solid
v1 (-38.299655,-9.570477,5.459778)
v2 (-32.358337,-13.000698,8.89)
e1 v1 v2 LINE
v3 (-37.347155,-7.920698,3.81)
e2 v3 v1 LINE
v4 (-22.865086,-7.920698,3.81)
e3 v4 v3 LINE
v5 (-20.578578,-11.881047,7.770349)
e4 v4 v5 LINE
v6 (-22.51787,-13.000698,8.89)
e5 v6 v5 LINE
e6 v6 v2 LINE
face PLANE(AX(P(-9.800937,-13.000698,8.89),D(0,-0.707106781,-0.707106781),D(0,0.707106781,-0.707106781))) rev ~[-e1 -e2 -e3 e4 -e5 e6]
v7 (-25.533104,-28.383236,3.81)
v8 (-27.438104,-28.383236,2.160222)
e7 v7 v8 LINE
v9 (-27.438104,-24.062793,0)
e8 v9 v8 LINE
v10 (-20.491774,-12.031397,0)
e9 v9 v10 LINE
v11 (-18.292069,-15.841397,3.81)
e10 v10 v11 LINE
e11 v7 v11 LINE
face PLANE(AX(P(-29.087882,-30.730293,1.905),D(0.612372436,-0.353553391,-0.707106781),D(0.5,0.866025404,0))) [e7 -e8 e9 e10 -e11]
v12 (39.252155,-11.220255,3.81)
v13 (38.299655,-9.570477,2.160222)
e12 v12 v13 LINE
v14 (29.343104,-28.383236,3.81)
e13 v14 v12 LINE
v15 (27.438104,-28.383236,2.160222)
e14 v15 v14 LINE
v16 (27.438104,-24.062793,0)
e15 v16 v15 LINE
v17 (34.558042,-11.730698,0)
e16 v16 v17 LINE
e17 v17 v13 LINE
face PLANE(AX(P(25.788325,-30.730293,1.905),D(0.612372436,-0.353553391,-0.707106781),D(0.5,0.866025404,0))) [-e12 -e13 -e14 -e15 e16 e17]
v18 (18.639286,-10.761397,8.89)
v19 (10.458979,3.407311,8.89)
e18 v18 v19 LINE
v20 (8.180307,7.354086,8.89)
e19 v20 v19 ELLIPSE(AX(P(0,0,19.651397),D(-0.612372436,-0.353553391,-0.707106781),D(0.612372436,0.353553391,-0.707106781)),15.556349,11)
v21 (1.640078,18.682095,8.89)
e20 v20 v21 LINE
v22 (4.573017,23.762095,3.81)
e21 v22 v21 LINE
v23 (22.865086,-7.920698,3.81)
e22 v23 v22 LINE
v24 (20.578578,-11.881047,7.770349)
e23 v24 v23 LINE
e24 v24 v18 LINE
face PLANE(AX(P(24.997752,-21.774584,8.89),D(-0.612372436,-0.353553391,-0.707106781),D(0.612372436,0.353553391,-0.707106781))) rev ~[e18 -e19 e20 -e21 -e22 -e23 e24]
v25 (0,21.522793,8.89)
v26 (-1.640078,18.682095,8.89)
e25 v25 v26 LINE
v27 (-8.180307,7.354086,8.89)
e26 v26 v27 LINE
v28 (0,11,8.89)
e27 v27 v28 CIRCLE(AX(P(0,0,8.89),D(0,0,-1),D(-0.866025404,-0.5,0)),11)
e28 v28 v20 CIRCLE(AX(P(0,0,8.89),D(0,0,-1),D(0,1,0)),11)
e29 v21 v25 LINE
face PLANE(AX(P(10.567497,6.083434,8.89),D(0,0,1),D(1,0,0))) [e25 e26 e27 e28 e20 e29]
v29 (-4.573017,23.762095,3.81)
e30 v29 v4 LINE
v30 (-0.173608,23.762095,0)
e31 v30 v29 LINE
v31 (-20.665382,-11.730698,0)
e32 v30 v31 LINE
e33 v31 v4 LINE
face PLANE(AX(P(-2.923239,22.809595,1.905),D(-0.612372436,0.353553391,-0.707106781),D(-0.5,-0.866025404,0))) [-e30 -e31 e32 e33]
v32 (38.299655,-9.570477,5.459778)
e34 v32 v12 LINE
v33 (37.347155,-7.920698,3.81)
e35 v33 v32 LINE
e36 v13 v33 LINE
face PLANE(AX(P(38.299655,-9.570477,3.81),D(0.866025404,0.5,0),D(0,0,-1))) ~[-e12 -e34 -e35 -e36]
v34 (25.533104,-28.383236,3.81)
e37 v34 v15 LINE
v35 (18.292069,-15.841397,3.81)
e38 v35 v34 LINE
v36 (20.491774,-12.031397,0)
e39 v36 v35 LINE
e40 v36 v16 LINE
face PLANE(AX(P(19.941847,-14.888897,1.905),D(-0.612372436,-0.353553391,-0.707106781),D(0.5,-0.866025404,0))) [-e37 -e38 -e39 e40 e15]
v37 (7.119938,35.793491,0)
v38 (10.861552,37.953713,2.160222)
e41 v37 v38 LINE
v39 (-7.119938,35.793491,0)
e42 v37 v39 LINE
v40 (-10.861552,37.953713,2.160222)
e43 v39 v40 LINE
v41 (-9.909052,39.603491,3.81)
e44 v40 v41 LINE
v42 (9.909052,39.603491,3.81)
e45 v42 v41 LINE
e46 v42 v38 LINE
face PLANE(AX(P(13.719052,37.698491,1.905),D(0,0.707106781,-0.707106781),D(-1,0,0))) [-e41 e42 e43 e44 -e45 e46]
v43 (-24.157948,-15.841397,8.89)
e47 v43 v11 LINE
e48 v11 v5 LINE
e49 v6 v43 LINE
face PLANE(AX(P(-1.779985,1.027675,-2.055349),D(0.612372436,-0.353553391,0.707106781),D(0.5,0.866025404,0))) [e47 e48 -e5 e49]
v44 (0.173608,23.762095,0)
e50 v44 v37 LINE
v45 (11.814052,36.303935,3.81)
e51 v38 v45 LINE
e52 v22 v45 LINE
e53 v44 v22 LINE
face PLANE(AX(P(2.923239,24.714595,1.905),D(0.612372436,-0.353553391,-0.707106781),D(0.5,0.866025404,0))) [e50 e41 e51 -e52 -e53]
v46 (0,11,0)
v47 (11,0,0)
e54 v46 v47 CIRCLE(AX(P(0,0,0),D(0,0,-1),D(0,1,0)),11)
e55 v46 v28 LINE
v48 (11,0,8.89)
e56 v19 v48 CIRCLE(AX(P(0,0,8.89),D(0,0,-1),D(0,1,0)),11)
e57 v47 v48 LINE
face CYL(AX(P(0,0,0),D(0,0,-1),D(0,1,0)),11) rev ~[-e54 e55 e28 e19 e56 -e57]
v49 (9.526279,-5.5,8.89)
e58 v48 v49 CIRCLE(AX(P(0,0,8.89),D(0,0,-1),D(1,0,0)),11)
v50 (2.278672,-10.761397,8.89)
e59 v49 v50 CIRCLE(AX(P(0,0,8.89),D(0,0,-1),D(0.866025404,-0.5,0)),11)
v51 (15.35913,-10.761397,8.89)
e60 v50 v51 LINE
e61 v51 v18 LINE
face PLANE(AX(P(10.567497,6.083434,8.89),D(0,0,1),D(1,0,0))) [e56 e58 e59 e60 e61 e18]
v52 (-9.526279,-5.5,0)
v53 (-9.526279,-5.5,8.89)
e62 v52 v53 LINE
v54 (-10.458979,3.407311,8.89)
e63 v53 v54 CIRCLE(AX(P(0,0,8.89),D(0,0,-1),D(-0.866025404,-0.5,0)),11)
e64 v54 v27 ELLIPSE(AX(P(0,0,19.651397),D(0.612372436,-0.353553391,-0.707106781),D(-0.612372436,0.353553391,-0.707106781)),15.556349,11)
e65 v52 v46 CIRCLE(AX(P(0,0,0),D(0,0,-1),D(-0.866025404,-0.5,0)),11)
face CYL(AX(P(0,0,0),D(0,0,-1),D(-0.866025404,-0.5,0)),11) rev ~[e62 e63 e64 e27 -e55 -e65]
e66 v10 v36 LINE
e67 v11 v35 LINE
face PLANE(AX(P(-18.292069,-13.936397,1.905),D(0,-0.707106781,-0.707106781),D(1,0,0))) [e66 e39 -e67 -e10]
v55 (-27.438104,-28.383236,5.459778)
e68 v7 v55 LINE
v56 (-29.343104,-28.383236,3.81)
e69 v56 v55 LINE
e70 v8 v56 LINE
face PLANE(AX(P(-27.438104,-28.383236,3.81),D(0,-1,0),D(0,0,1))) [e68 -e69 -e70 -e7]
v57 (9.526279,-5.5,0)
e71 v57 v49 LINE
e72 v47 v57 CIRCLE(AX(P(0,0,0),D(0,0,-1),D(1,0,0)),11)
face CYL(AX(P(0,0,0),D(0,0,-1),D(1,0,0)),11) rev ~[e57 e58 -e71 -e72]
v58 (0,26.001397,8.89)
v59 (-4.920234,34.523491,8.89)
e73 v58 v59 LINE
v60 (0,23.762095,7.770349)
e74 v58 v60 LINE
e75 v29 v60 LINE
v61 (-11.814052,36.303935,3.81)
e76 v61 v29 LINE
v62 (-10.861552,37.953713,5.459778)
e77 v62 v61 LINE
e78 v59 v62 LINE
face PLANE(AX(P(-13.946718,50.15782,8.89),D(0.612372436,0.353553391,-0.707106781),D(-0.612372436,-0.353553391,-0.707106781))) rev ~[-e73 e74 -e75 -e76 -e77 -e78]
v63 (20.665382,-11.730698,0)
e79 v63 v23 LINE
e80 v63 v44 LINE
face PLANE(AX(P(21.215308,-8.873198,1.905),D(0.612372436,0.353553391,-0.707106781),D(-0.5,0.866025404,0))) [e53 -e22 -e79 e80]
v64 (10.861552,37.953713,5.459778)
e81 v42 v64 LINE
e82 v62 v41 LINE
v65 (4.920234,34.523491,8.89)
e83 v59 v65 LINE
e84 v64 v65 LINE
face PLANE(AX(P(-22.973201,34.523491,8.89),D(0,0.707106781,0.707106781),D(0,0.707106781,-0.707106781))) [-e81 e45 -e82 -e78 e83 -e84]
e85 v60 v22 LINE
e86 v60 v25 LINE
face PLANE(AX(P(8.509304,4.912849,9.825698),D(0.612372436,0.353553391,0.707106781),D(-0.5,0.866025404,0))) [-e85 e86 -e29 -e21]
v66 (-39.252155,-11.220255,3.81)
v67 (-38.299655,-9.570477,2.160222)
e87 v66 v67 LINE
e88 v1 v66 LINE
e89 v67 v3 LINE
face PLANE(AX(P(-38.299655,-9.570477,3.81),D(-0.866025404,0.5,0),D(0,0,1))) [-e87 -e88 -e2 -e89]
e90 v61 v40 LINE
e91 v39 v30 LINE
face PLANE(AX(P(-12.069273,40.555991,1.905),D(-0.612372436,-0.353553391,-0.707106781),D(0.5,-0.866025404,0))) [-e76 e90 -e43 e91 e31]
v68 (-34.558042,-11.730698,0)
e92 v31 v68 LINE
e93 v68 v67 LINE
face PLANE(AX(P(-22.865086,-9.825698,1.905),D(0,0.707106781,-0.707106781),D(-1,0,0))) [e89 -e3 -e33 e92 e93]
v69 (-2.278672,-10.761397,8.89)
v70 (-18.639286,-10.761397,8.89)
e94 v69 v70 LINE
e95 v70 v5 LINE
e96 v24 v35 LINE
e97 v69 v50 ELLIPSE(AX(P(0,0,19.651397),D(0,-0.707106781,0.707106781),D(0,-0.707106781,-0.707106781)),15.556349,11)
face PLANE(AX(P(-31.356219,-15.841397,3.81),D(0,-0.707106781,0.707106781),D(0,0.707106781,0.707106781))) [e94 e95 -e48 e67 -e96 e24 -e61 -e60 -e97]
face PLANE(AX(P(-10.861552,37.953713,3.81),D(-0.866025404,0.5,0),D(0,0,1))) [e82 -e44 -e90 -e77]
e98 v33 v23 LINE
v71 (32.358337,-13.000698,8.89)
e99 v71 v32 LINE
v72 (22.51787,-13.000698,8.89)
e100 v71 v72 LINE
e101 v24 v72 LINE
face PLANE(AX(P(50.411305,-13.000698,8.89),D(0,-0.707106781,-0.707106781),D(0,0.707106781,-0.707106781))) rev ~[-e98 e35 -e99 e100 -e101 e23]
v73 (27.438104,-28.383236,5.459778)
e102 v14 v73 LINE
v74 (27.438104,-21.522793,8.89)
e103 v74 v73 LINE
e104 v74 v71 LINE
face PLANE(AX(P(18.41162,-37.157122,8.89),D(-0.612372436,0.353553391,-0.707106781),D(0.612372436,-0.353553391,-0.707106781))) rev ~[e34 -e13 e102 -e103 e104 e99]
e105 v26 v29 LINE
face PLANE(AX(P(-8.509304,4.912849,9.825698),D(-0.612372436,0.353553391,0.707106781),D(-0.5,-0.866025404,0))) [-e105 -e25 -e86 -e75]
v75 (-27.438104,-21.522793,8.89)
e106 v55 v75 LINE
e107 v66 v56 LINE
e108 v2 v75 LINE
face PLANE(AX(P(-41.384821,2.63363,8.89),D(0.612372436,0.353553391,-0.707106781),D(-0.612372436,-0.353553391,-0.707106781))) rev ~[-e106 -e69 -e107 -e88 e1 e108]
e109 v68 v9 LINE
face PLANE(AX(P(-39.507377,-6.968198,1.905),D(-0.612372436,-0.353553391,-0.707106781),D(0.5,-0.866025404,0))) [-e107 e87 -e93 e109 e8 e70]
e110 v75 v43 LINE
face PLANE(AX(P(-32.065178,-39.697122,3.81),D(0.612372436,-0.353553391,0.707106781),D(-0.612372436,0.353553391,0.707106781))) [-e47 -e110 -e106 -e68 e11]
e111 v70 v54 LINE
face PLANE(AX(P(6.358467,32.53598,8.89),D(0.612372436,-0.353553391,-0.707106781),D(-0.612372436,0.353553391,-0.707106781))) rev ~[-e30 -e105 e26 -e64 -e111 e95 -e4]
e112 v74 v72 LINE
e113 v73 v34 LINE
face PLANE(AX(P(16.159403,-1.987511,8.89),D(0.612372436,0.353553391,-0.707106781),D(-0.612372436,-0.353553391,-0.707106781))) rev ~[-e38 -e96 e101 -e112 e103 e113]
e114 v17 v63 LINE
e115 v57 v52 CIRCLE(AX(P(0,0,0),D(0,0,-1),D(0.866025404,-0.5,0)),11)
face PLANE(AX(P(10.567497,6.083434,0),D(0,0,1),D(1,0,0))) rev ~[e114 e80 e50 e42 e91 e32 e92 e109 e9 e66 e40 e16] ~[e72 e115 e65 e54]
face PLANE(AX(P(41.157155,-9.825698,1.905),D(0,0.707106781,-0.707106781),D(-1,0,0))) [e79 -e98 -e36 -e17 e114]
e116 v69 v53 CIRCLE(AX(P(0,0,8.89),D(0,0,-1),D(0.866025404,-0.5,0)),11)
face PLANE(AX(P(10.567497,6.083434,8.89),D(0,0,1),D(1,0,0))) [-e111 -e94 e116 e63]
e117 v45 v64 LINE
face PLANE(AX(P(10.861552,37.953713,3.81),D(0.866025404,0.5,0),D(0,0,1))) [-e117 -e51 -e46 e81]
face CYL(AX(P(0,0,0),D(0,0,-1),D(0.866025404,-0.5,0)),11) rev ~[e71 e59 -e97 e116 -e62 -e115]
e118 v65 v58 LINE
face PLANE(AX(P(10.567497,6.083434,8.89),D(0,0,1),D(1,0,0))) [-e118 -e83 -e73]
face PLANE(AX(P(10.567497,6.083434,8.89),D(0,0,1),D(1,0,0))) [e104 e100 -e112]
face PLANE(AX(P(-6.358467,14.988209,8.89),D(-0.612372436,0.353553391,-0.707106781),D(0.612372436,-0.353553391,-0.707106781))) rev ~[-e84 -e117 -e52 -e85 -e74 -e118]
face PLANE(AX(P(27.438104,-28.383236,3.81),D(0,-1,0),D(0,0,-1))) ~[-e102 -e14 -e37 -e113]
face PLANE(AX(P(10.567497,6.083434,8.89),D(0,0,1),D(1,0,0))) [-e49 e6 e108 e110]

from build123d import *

# Parameters (mm, degrees)
F1_DEPTH      = 8.89
F2_DEPTH      = 8.89
F3_SIZE       = 3.81
F4_SIZE       = 3.81
F5_T1_DEPTH   = 45.9464028027
F5_T3_DEPTH   = 45.9464028027
F5_T5_DEPTH   = 45.9464028027
F5_T10_DEPTH  = 40.6103682544
F5_T15_DEPTH  = 40.6103682544
F5_T20_DEPTH  = 62.7124373511
F5_T26_DEPTH  = 62.7124373511
F5_T32_DEPTH  = 40.6103682544
F5_T37_DEPTH  = 40.6103682544
F5_T42_DEPTH  = 62.7124373511
F5_T48_DEPTH  = 40.6103682544
F5_T53_DEPTH  = 40.6103682544
F5_T58_DEPTH  = 29.9382991577
F5_T63_DEPTH  = 29.9382991577
F5_T68_DEPTH  = 29.9382991577
F5_T73_DEPTH  = 29.9382991577
F5_T78_DEPTH  = 29.9382991577
F5_T83_DEPTH  = 29.9382991577
F5_T88_DEPTH  = 29.9382991577
F5_T93_DEPTH  = 29.9382991577
F5_T98_DEPTH  = 29.9382991577
F5_T103_DEPTH = 29.9382991577
F5_T108_DEPTH = 29.9382991577
F5_T113_DEPTH = 29.9382991577


# Not quite as in the source:
# - a fillet or chamfer that OpenCascade refuses, or shapes differently, is made with other operations: its cross-section is extruded or revolved along the edge and cut away or added


with BuildPart() as f1:
    # F0 (on Top) → F1 (new body)
    with BuildSketch(Plane.XY):
        with BuildLine():
            ThreePointArc((0, 11), (7.7781745931, 7.7781745931), (11, 0))
            ThreePointArc((11, 0), (10.6251840892, -2.8470094961), (9.5262794416, -5.5))
            Line((9.5262794416, -5.5), (13.7190518225, -7.9206982628))
            Line((13.7190518225, -7.9206982628), (22.8650863708, -7.9206982628))
            Line((22.8650863708, -7.9206982628), (4.5730172742, 23.7620947883))
            Line((4.5730172742, 23.7620947883), (0, 15.8413965255))
            Line((0, 15.8413965255), (0, 11))
        make_face()
        with BuildLine():
            Line((13.7190518225, -7.9206982628), (9.5262794416, -5.5))
            ThreePointArc((9.5262794416, -5.5), (0, -11), (-9.5262794416, -5.5))
            Line((-9.5262794416, -5.5), (-13.7190518225, -7.9206982628))
            Line((-13.7190518225, -7.9206982628), (-18.2920690967, -15.8413965255))
            Line((-18.2920690967, -15.8413965255), (18.2920690967, -15.8413965255))
            Line((18.2920690967, -15.8413965255), (13.7190518225, -7.9206982628))
        make_face()
        with BuildLine():
            ThreePointArc((-9.5262794416, -5.5), (-9.5262794416, 5.5), (0, 11))
            Line((0, 11), (0, 15.8413965255))
            Line((0, 15.8413965255), (-4.5730172742, 23.7620947883))
            Line((-4.5730172742, 23.7620947883), (-22.8650863708, -7.9206982628))
            Line((-22.8650863708, -7.9206982628), (-13.7190518225, -7.9206982628))
            Line((-13.7190518225, -7.9206982628), (-9.5262794416, -5.5))
        make_face()
    extrude(amount=F1_DEPTH)

    # F0 (on Top) → F2 (join)
    with BuildSketch(Plane.XY):
        with BuildLine():
            ThreePointArc((0, 11), (7.7781745931, 7.7781745931), (11, 0))
            ThreePointArc((11, 0), (10.6251840892, -2.8470094961), (9.5262794416, -5.5))
            Line((9.5262794416, -5.5), (13.7190518225, -7.9206982628))
            Line((13.7190518225, -7.9206982628), (22.8650863708, -7.9206982628))
            Line((22.8650863708, -7.9206982628), (4.5730172742, 23.7620947883))
            Line((4.5730172742, 23.7620947883), (0, 15.8413965255))
            Line((0, 15.8413965255), (0, 11))
        make_face()
        with BuildLine():
            ThreePointArc((-9.5262794416, -5.5), (-9.5262794416, 5.5), (0, 11))
            Line((0, 11), (0, 15.8413965255))
            Line((0, 15.8413965255), (-4.5730172742, 23.7620947883))
            Line((-4.5730172742, 23.7620947883), (-22.8650863708, -7.9206982628))
            Line((-22.8650863708, -7.9206982628), (-13.7190518225, -7.9206982628))
            Line((-13.7190518225, -7.9206982628), (-9.5262794416, -5.5))
        make_face()
        with BuildLine():
            Line((13.7190518225, -7.9206982628), (9.5262794416, -5.5))
            ThreePointArc((9.5262794416, -5.5), (0, -11), (-9.5262794416, -5.5))
            Line((-9.5262794416, -5.5), (-13.7190518225, -7.9206982628))
            Line((-13.7190518225, -7.9206982628), (-18.2920690967, -15.8413965255))
            Line((-18.2920690967, -15.8413965255), (18.2920690967, -15.8413965255))
            Line((18.2920690967, -15.8413965255), (13.7190518225, -7.9206982628))
        make_face()
        Polygon((-4.5730172742, 23.7620947883), (0, 15.8413965255), (0, 31.682793051), align=None)
        Polygon((0, 31.682793051), (0, 15.8413965255), (4.5730172742, 23.7620947883), align=None)
        Polygon((22.8650863708, -7.9206982628), (13.7190518225, -7.9206982628), (27.438103645, -15.8413965255), align=None)
        Polygon((27.438103645, -15.8413965255), (13.7190518225, -7.9206982628), (18.2920690967, -15.8413965255), align=None)
        Polygon((-18.2920690967, -15.8413965255), (-13.7190518225, -7.9206982628), (-27.438103645, -15.8413965255), align=None)
        Polygon((-27.438103645, -15.8413965255), (-13.7190518225, -7.9206982628), (-22.8650863708, -7.9206982628), align=None)
        Polygon((-4.5730172742, 23.7620947883), (0, 31.682793051), (4.5730172742, 23.7620947883), (13.7190518225, 39.6034913138), (-13.7190518225, 39.6034913138), align=None)
        Polygon((22.8650863708, -7.9206982628), (27.438103645, -15.8413965255), (18.2920690967, -15.8413965255), (27.438103645, -31.682793051), (41.1571554675, -7.9206982628), align=None)
        Polygon((-18.2920690967, -15.8413965255), (-27.438103645, -15.8413965255), (-22.8650863708, -7.9206982628), (-41.1571554675, -7.9206982628), (-27.438103645, -31.682793051), align=None)
    extrude(amount=F2_DEPTH)

    # F3
    f3_edges = [f1.edges().sort_by_distance(p)[0] for p in [
        (-22.865086, -23.762095, 0),
        (-34.29763, -19.801746, 0),
        (-32.011121, -7.920698, 0),
        (0, -15.841397, 0),
        (-13.719052, 7.920698, 0),
        (-9.146035, 31.682793, 0),
        (9.146035, 31.682793, 0),
        (13.719052, 7.920698, 0),
        (32.011121, -7.920698, 0),
        (34.29763, -19.801746, 0),
        (22.865086, -23.762095, 0),
        (0, 39.603491, 0),
    ]]
    chamfer(f3_edges, length=F3_SIZE)

    # F4
    f4_edges = [f1.edges().sort_by_distance(p)[0] for p in [
        (27.438104, -31.682793, 6.35),
        (41.157155, -7.920698, 6.35),
        (13.719052, 39.603491, 6.35),
        (-27.438104, -31.682793, 6.35),
        (-13.719052, 39.603491, 6.35),
        (-41.157155, -7.920698, 6.35),
    ]]
    chamfer(f4_edges, length=F4_SIZE)

    # F5: chamfer of 5.08 on 18 edges, made by hand

    # F5_s2 → F5_t1 (cut)
    with BuildSketch(Plane.YZ.offset(-22.9732014014)):
        Polygon((34.5234913138, 8.89), (39.6034913138, 3.81), (39.6034913138, 8.89), align=None)
    extrude(amount=F5_T1_DEPTH, mode=Mode.SUBTRACT)

    # F5_s4 → F5_t3 (cut)
    with BuildSketch(Plane(origin=(-11.4866007007, -19.8953760198, 0), x_dir=(0, 0, 1), z_dir=(0.5, 0.8660254038, 0))):
        Polygon((8.89, 34.5234913138), (3.81, 39.6034913138), (8.89, 39.6034913138), align=None)
    extrude(amount=F5_T3_DEPTH, mode=Mode.SUBTRACT)

    # F5_s6 → F5_t5 (cut)
    with BuildSketch(Plane(origin=(-11.4866007007, 19.8953760198, 0), x_dir=(0, 0, 1), z_dir=(0.5, -0.8660254038, 0))):
        Polygon((8.89, 34.5234913138), (3.81, 39.6034913138), (8.89, 39.6034913138), align=None)
    extrude(amount=F5_T5_DEPTH, mode=Mode.SUBTRACT)


with BuildPart() as f5_tool8:
    # F5_s9 → F5_t10 (new body)
    with BuildSketch(Plane(origin=(4.900468396, 8.4878602427, 0), x_dir=(0, 0, 1), z_dir=(0.5, 0.8660254038, 0))):
        Polygon((8.89, -13.0006982628), (3.81, -7.9206982628), (8.89, -7.9206982628), align=None)
    extrude(amount=F5_T10_DEPTH)

    split(bisect_by=Plane(origin=(8.5093043055, 4.9128491314, 9.8256982628), x_dir=(-0.5, 0.8660254038, 0), z_dir=(0.6123724357, 0.3535533906, 0.7071067812)), keep=Keep.TOP)


with BuildPart() as f1_1:
    add(f1.part)

    # F5_t7: cut F5_tool8
    add(f5_tool8.part, mode=Mode.SUBTRACT)


with BuildPart() as f5_tool13:
    # F5_s14 → F5_t15 (new body)
    with BuildSketch(Plane(origin=(-25.2056525232, 43.6574708081, 0), x_dir=(0, 0, 1), z_dir=(0.5, -0.8660254038, 0))):
        Polygon((8.89, -13.0006982628), (3.81, -7.9206982628), (8.89, -7.9206982628), align=None)
    extrude(amount=F5_T15_DEPTH)

    split(bisect_by=Plane(origin=(-8.5093043055, 4.9128491314, 9.8256982628), x_dir=(-0.5, -0.8660254038, 0), z_dir=(-0.6123724357, 0.3535533906, 0.7071067812)), keep=Keep.TOP)


with BuildPart() as f1_2:
    add(f1_1.part)

    # F5_t12: cut F5_tool13
    add(f5_tool13.part, mode=Mode.SUBTRACT)


with BuildPart() as f5_tool18:
    # F5_s19 → F5_t20 (new body)
    with BuildSketch(Plane(origin=(15.6781093378, 27.1552819396, 0), x_dir=(0, 0, 1), z_dir=(-0.5, -0.8660254038, 0))):
        Polygon((8.89, 10.7613965255), (3.81, 15.8413965255), (8.89, 15.8413965255), align=None)
    extrude(amount=F5_T20_DEPTH)

    split(bisect_by=Plane(origin=(1.7799845614, 1.0276745657, -2.0553491314), x_dir=(0.5, -0.8660254038, 0), z_dir=(-0.6123724357, -0.3535533906, 0.7071067812)), keep=Keep.TOP)

    split(bisect_by=Plane(origin=(0, -2.0553491314, -2.0553491314), x_dir=(1, 0, 0), z_dir=(0, 0.7071067812, 0.7071067812)), keep=Keep.TOP)


with BuildPart() as f1_3:
    add(f1_2.part)

    # F5_t17: cut F5_tool18
    add(f5_tool18.part, mode=Mode.SUBTRACT)


with BuildPart() as f5_tool24:
    # F5_s25 → F5_t26 (new body)
    with BuildSketch(Plane(origin=(15.6781093378, -27.1552819396, 0), x_dir=(0, 0, 1), z_dir=(-0.5, 0.8660254038, 0))):
        Polygon((8.89, 10.7613965255), (3.81, 15.8413965255), (8.89, 15.8413965255), align=None)
    extrude(amount=F5_T26_DEPTH)

    split(bisect_by=Plane(origin=(0, -2.0553491314, -2.0553491314), x_dir=(1, 0, 0), z_dir=(0, 0.7071067812, 0.7071067812)), keep=Keep.TOP)

    split(bisect_by=Plane(origin=(-1.7799845614, 1.0276745657, -2.0553491314), x_dir=(0.5, 0.8660254038, 0), z_dir=(0.6123724357, -0.3535533906, 0.7071067812)), keep=Keep.TOP)


with BuildPart() as f1_4:
    add(f1_3.part)

    # F5_t23: cut F5_tool24
    add(f5_tool24.part, mode=Mode.SUBTRACT)


with BuildPart() as f5_tool30:
    # F5_s31 → F5_t32 (new body)
    with BuildSketch(Plane.YZ.offset(50.4113050464)):
        Polygon((-13.0006982628, 8.89), (-7.9206982628, 3.81), (-7.9206982628, 8.89), align=None)
    extrude(amount=-F5_T32_DEPTH)

    split(bisect_by=Plane(origin=(8.5093043055, 4.9128491314, 9.8256982628), x_dir=(-0.5, 0.8660254038, 0), z_dir=(0.6123724357, 0.3535533906, 0.7071067812)), keep=Keep.TOP)


with BuildPart() as f1_5:
    add(f1_4.part)

    # F5_t29: cut F5_tool30
    add(f5_tool30.part, mode=Mode.SUBTRACT)


with BuildPart() as f5_tool35:
    # F5_s36 → F5_t37 (new body)
    with BuildSketch(Plane(origin=(4.900468396, -8.4878602427, 0), x_dir=(0, 0, 1), z_dir=(0.5, -0.8660254038, 0))):
        Polygon((8.89, -13.0006982628), (3.81, -7.9206982628), (8.89, -7.9206982628), align=None)
    extrude(amount=F5_T37_DEPTH)

    split(bisect_by=Plane(origin=(0, -9.8256982628, 9.8256982628), x_dir=(1, 0, 0), z_dir=(0, -0.7071067812, 0.7071067812)), keep=Keep.TOP)


with BuildPart() as f1_6:
    add(f1_5.part)

    # F5_t34: cut F5_tool35
    add(f5_tool35.part, mode=Mode.SUBTRACT)


with BuildPart() as f5_tool40:
    # F5_s41 → F5_t42 (new body)
    with BuildSketch(Plane.YZ.offset(-31.3562186755)):
        Polygon((-15.8413965255, 3.81), (-10.7613965255, 8.89), (-15.8413965255, 8.89), align=None)
    extrude(amount=F5_T42_DEPTH)

    split(bisect_by=Plane(origin=(-1.7799845614, 1.0276745657, -2.0553491314), x_dir=(0.5, 0.8660254038, 0), z_dir=(0.6123724357, -0.3535533906, 0.7071067812)), keep=Keep.TOP)

    split(bisect_by=Plane(origin=(1.7799845614, 1.0276745657, -2.0553491314), x_dir=(0.5, -0.8660254038, 0), z_dir=(-0.6123724357, -0.3535533906, 0.7071067812)), keep=Keep.TOP)


with BuildPart() as f1_7:
    add(f1_6.part)

    # F5_t39: cut F5_tool40
    add(f5_tool40.part, mode=Mode.SUBTRACT)


with BuildPart() as f5_tool46:
    # F5_s47 → F5_t48 (new body)
    with BuildSketch(Plane(origin=(-25.2056525232, -43.6574708081, 0), x_dir=(0, 0, 1), z_dir=(0.5, 0.8660254038, 0))):
        Polygon((3.81, -7.9206982628), (8.89, -13.0006982628), (8.89, -7.9206982628), align=None)
    extrude(amount=F5_T48_DEPTH)

    split(bisect_by=Plane(origin=(0, -9.8256982628, 9.8256982628), x_dir=(1, 0, 0), z_dir=(0, -0.7071067812, 0.7071067812)), keep=Keep.TOP)


with BuildPart() as f1_8:
    add(f1_7.part)

    # F5_t45: cut F5_tool46
    add(f5_tool46.part, mode=Mode.SUBTRACT)


with BuildPart() as f5_tool51:
    # F5_s52 → F5_t53 (new body)
    with BuildSketch(Plane.YZ.offset(-9.800936792)):
        Polygon((-13.0006982628, 8.89), (-7.9206982628, 3.81), (-7.9206982628, 8.89), align=None)
    extrude(amount=-F5_T53_DEPTH)

    split(bisect_by=Plane(origin=(-8.5093043055, 4.9128491314, 9.8256982628), x_dir=(-0.5, -0.8660254038, 0), z_dir=(-0.6123724357, 0.3535533906, 0.7071067812)), keep=Keep.TOP)


with BuildPart() as f1_9:
    add(f1_8.part)

    # F5_t50: cut F5_tool51
    add(f5_tool51.part, mode=Mode.SUBTRACT)


with BuildPart() as f5_tool56:
    # F5_s57 → F5_t58 (new body)
    with BuildSketch(Plane(origin=(-21.2036266119, -36.7257585966, 0), x_dir=(0, 0, 1), z_dir=(0.5, 0.8660254038, 0))):
        Polygon((8.89, -23.3032362626), (3.81, -28.3832362626), (8.89, -28.3832362626), align=None)
    extrude(amount=F5_T58_DEPTH)

    split(bisect_by=Plane(origin=(-18.7985931723, -10.8533728284, 21.7067456569), x_dir=(0.5, -0.8660254038, 0), z_dir=(-0.6123724357, -0.3535533906, 0.7071067812)), keep=Keep.TOP)


with BuildPart() as f1_10:
    add(f1_9.part)

    # F5_t55: cut F5_tool56
    add(f5_tool56.part, mode=Mode.SUBTRACT)


with BuildPart() as f5_tool61:
    # F5_s62 → F5_t63 (new body)
    with BuildSketch(Plane(origin=(-21.2036266119, -36.7257585966, 0), x_dir=(0, 0, 1), z_dir=(0.5, 0.8660254038, 0))):
        Polygon((8.89, -23.3032362626), (3.81, -28.3832362626), (8.89, -28.3832362626), align=None)
    extrude(amount=F5_T63_DEPTH)

    split(bisect_by=Plane(origin=(0, -2.0553491314, -2.0553491314), x_dir=(1, 0, 0), z_dir=(0, 0.7071067812, 0.7071067812)), keep=Keep.TOP)


with BuildPart() as f1_11:
    add(f1_10.part)

    # F5_t60: cut F5_tool61
    add(f5_tool61.part, mode=Mode.SUBTRACT)


with BuildPart() as f5_tool66:
    # F5_s67 → F5_t68 (new body)
    with BuildSketch(Plane.YZ.offset(-12.4689540661)):
        Polygon((-28.3832362626, 3.81), (-23.3032362626, 8.89), (-28.3832362626, 8.89), align=None)
    extrude(amount=-F5_T68_DEPTH)

    split(bisect_by=Plane(origin=(-1.7799845614, 1.0276745657, -2.0553491314), x_dir=(0.5, 0.8660254038, 0), z_dir=(0.6123724357, -0.3535533906, 0.7071067812)), keep=Keep.TOP)


with BuildPart() as f1_12:
    add(f1_11.part)

    # F5_t65: cut F5_tool66
    add(f5_tool66.part, mode=Mode.SUBTRACT)


with BuildPart() as f5_tool71:
    # F5_s72 → F5_t73 (new body)
    with BuildSketch(Plane.YZ.offset(-12.4689540661)):
        Polygon((-28.3832362626, 3.81), (-23.3032362626, 8.89), (-28.3832362626, 8.89), align=None)
    extrude(amount=-F5_T73_DEPTH)

    split(bisect_by=Plane(origin=(-18.7985931723, -10.8533728284, 21.7067456569), x_dir=(0.5, -0.8660254038, 0), z_dir=(-0.6123724357, -0.3535533906, 0.7071067812)), keep=Keep.TOP)


with BuildPart() as f1_13:
    add(f1_12.part)

    # F5_t70: cut F5_tool71
    add(f5_tool71.part, mode=Mode.SUBTRACT)


with BuildPart() as f5_tool76:
    # F5_s77 → F5_t78 (new body)
    with BuildSketch(Plane.YZ.offset(12.4689540661)):
        Polygon((-23.3032362626, 8.89), (-28.3832362626, 3.81), (-28.3832362626, 8.89), align=None)
    extrude(amount=F5_T78_DEPTH)

    split(bisect_by=Plane(origin=(1.7799845614, 1.0276745657, -2.0553491314), x_dir=(0.5, -0.8660254038, 0), z_dir=(-0.6123724357, -0.3535533906, 0.7071067812)), keep=Keep.TOP)


with BuildPart() as f1_14:
    add(f1_13.part)

    # F5_t75: cut F5_tool76
    add(f5_tool76.part, mode=Mode.SUBTRACT)


with BuildPart() as f5_tool81:
    # F5_s82 → F5_t83 (new body)
    with BuildSketch(Plane.YZ.offset(12.4689540661)):
        Polygon((-23.3032362626, 8.89), (-28.3832362626, 3.81), (-28.3832362626, 8.89), align=None)
    extrude(amount=F5_T83_DEPTH)

    split(bisect_by=Plane(origin=(18.7985931723, -10.8533728284, 21.7067456569), x_dir=(0.5, 0.8660254038, 0), z_dir=(0.6123724357, -0.3535533906, 0.7071067812)), keep=Keep.TOP)


with BuildPart() as f1_15:
    add(f1_14.part)

    # F5_t80: cut F5_tool81
    add(f5_tool81.part, mode=Mode.SUBTRACT)


with BuildPart() as f5_tool86:
    # F5_s87 → F5_t88 (new body)
    with BuildSketch(Plane(origin=(21.2036266119, -36.7257585966, 0), x_dir=(0, 0, 1), z_dir=(-0.5, 0.8660254038, 0))):
        Polygon((8.89, 23.3032362626), (3.81, 28.3832362626), (8.89, 28.3832362626), align=None)
    extrude(amount=F5_T88_DEPTH)

    split(bisect_by=Plane(origin=(18.7985931723, -10.8533728284, 21.7067456569), x_dir=(0.5, 0.8660254038, 0), z_dir=(0.6123724357, -0.3535533906, 0.7071067812)), keep=Keep.TOP)


with BuildPart() as f1_16:
    add(f1_15.part)

    # F5_t85: cut F5_tool86
    add(f5_tool86.part, mode=Mode.SUBTRACT)


with BuildPart() as f5_tool91:
    # F5_s92 → F5_t93 (new body)
    with BuildSketch(Plane(origin=(21.2036266119, -36.7257585966, 0), x_dir=(0, 0, 1), z_dir=(-0.5, 0.8660254038, 0))):
        Polygon((8.89, 23.3032362626), (3.81, 28.3832362626), (8.89, 28.3832362626), align=None)
    extrude(amount=F5_T93_DEPTH)

    split(bisect_by=Plane(origin=(0, -2.0553491314, -2.0553491314), x_dir=(1, 0, 0), z_dir=(0, 0.7071067812, 0.7071067812)), keep=Keep.TOP)


with BuildPart() as f1_17:
    add(f1_16.part)

    # F5_t90: cut F5_tool91
    add(f5_tool91.part, mode=Mode.SUBTRACT)


with BuildPart() as f5_tool96:
    # F5_s97 → F5_t98 (new body)
    with BuildSketch(Plane(origin=(-6.2344770331, 10.7984309799, 0), x_dir=(0, 0, 1), z_dir=(-0.5, 0.8660254038, 0))):
        Polygon((8.89, 23.3032362626), (3.81, 28.3832362626), (8.89, 28.3832362626), align=None)
    extrude(amount=F5_T98_DEPTH)

    split(bisect_by=Plane(origin=(-1.7799845614, 1.0276745657, -2.0553491314), x_dir=(0.5, 0.8660254038, 0), z_dir=(0.6123724357, -0.3535533906, 0.7071067812)), keep=Keep.TOP)


with BuildPart() as f1_18:
    add(f1_17.part)

    # F5_t95: cut F5_tool96
    add(f5_tool96.part, mode=Mode.SUBTRACT)


with BuildPart() as f5_tool101:
    # F5_s102 → F5_t103 (new body)
    with BuildSketch(Plane(origin=(-6.2344770331, 10.7984309799, 0), x_dir=(0, 0, 1), z_dir=(-0.5, 0.8660254038, 0))):
        Polygon((8.89, 23.3032362626), (3.81, 28.3832362626), (8.89, 28.3832362626), align=None)
    extrude(amount=F5_T103_DEPTH)

    split(bisect_by=Plane(origin=(0, 21.7067456569, 21.7067456569), x_dir=(1, 0, 0), z_dir=(0, 0.7071067812, 0.7071067812)), keep=Keep.TOP)


with BuildPart() as f1_19:
    add(f1_18.part)

    # F5_t100: cut F5_tool101
    add(f5_tool101.part, mode=Mode.SUBTRACT)


with BuildPart() as f5_tool106:
    # F5_s107 → F5_t108 (new body)
    with BuildSketch(Plane(origin=(21.2036266119, 36.7257585966, 0), x_dir=(0, 0, 1), z_dir=(-0.5, -0.8660254038, 0))):
        Polygon((8.89, 23.3032362626), (3.81, 28.3832362626), (8.89, 28.3832362626), align=None)
    extrude(amount=F5_T108_DEPTH)

    split(bisect_by=Plane(origin=(0, 21.7067456569, 21.7067456569), x_dir=(1, 0, 0), z_dir=(0, 0.7071067812, 0.7071067812)), keep=Keep.TOP)


with BuildPart() as f1_20:
    add(f1_19.part)

    # F5_t105: cut F5_tool106
    add(f5_tool106.part, mode=Mode.SUBTRACT)


with BuildPart() as f5_tool111:
    # F5_s112 → F5_t113 (new body)
    with BuildSketch(Plane(origin=(21.2036266119, 36.7257585966, 0), x_dir=(0, 0, 1), z_dir=(-0.5, -0.8660254038, 0))):
        Polygon((8.89, 23.3032362626), (3.81, 28.3832362626), (8.89, 28.3832362626), align=None)
    extrude(amount=F5_T113_DEPTH)

    split(bisect_by=Plane(origin=(1.7799845614, 1.0276745657, -2.0553491314), x_dir=(0.5, -0.8660254038, 0), z_dir=(-0.6123724357, -0.3535533906, 0.7071067812)), keep=Keep.TOP)


with BuildPart() as f1_21:
    add(f1_20.part)

    # F5_t110: cut F5_tool111
    add(f5_tool111.part, mode=Mode.SUBTRACT)


solid = f1_21.part
